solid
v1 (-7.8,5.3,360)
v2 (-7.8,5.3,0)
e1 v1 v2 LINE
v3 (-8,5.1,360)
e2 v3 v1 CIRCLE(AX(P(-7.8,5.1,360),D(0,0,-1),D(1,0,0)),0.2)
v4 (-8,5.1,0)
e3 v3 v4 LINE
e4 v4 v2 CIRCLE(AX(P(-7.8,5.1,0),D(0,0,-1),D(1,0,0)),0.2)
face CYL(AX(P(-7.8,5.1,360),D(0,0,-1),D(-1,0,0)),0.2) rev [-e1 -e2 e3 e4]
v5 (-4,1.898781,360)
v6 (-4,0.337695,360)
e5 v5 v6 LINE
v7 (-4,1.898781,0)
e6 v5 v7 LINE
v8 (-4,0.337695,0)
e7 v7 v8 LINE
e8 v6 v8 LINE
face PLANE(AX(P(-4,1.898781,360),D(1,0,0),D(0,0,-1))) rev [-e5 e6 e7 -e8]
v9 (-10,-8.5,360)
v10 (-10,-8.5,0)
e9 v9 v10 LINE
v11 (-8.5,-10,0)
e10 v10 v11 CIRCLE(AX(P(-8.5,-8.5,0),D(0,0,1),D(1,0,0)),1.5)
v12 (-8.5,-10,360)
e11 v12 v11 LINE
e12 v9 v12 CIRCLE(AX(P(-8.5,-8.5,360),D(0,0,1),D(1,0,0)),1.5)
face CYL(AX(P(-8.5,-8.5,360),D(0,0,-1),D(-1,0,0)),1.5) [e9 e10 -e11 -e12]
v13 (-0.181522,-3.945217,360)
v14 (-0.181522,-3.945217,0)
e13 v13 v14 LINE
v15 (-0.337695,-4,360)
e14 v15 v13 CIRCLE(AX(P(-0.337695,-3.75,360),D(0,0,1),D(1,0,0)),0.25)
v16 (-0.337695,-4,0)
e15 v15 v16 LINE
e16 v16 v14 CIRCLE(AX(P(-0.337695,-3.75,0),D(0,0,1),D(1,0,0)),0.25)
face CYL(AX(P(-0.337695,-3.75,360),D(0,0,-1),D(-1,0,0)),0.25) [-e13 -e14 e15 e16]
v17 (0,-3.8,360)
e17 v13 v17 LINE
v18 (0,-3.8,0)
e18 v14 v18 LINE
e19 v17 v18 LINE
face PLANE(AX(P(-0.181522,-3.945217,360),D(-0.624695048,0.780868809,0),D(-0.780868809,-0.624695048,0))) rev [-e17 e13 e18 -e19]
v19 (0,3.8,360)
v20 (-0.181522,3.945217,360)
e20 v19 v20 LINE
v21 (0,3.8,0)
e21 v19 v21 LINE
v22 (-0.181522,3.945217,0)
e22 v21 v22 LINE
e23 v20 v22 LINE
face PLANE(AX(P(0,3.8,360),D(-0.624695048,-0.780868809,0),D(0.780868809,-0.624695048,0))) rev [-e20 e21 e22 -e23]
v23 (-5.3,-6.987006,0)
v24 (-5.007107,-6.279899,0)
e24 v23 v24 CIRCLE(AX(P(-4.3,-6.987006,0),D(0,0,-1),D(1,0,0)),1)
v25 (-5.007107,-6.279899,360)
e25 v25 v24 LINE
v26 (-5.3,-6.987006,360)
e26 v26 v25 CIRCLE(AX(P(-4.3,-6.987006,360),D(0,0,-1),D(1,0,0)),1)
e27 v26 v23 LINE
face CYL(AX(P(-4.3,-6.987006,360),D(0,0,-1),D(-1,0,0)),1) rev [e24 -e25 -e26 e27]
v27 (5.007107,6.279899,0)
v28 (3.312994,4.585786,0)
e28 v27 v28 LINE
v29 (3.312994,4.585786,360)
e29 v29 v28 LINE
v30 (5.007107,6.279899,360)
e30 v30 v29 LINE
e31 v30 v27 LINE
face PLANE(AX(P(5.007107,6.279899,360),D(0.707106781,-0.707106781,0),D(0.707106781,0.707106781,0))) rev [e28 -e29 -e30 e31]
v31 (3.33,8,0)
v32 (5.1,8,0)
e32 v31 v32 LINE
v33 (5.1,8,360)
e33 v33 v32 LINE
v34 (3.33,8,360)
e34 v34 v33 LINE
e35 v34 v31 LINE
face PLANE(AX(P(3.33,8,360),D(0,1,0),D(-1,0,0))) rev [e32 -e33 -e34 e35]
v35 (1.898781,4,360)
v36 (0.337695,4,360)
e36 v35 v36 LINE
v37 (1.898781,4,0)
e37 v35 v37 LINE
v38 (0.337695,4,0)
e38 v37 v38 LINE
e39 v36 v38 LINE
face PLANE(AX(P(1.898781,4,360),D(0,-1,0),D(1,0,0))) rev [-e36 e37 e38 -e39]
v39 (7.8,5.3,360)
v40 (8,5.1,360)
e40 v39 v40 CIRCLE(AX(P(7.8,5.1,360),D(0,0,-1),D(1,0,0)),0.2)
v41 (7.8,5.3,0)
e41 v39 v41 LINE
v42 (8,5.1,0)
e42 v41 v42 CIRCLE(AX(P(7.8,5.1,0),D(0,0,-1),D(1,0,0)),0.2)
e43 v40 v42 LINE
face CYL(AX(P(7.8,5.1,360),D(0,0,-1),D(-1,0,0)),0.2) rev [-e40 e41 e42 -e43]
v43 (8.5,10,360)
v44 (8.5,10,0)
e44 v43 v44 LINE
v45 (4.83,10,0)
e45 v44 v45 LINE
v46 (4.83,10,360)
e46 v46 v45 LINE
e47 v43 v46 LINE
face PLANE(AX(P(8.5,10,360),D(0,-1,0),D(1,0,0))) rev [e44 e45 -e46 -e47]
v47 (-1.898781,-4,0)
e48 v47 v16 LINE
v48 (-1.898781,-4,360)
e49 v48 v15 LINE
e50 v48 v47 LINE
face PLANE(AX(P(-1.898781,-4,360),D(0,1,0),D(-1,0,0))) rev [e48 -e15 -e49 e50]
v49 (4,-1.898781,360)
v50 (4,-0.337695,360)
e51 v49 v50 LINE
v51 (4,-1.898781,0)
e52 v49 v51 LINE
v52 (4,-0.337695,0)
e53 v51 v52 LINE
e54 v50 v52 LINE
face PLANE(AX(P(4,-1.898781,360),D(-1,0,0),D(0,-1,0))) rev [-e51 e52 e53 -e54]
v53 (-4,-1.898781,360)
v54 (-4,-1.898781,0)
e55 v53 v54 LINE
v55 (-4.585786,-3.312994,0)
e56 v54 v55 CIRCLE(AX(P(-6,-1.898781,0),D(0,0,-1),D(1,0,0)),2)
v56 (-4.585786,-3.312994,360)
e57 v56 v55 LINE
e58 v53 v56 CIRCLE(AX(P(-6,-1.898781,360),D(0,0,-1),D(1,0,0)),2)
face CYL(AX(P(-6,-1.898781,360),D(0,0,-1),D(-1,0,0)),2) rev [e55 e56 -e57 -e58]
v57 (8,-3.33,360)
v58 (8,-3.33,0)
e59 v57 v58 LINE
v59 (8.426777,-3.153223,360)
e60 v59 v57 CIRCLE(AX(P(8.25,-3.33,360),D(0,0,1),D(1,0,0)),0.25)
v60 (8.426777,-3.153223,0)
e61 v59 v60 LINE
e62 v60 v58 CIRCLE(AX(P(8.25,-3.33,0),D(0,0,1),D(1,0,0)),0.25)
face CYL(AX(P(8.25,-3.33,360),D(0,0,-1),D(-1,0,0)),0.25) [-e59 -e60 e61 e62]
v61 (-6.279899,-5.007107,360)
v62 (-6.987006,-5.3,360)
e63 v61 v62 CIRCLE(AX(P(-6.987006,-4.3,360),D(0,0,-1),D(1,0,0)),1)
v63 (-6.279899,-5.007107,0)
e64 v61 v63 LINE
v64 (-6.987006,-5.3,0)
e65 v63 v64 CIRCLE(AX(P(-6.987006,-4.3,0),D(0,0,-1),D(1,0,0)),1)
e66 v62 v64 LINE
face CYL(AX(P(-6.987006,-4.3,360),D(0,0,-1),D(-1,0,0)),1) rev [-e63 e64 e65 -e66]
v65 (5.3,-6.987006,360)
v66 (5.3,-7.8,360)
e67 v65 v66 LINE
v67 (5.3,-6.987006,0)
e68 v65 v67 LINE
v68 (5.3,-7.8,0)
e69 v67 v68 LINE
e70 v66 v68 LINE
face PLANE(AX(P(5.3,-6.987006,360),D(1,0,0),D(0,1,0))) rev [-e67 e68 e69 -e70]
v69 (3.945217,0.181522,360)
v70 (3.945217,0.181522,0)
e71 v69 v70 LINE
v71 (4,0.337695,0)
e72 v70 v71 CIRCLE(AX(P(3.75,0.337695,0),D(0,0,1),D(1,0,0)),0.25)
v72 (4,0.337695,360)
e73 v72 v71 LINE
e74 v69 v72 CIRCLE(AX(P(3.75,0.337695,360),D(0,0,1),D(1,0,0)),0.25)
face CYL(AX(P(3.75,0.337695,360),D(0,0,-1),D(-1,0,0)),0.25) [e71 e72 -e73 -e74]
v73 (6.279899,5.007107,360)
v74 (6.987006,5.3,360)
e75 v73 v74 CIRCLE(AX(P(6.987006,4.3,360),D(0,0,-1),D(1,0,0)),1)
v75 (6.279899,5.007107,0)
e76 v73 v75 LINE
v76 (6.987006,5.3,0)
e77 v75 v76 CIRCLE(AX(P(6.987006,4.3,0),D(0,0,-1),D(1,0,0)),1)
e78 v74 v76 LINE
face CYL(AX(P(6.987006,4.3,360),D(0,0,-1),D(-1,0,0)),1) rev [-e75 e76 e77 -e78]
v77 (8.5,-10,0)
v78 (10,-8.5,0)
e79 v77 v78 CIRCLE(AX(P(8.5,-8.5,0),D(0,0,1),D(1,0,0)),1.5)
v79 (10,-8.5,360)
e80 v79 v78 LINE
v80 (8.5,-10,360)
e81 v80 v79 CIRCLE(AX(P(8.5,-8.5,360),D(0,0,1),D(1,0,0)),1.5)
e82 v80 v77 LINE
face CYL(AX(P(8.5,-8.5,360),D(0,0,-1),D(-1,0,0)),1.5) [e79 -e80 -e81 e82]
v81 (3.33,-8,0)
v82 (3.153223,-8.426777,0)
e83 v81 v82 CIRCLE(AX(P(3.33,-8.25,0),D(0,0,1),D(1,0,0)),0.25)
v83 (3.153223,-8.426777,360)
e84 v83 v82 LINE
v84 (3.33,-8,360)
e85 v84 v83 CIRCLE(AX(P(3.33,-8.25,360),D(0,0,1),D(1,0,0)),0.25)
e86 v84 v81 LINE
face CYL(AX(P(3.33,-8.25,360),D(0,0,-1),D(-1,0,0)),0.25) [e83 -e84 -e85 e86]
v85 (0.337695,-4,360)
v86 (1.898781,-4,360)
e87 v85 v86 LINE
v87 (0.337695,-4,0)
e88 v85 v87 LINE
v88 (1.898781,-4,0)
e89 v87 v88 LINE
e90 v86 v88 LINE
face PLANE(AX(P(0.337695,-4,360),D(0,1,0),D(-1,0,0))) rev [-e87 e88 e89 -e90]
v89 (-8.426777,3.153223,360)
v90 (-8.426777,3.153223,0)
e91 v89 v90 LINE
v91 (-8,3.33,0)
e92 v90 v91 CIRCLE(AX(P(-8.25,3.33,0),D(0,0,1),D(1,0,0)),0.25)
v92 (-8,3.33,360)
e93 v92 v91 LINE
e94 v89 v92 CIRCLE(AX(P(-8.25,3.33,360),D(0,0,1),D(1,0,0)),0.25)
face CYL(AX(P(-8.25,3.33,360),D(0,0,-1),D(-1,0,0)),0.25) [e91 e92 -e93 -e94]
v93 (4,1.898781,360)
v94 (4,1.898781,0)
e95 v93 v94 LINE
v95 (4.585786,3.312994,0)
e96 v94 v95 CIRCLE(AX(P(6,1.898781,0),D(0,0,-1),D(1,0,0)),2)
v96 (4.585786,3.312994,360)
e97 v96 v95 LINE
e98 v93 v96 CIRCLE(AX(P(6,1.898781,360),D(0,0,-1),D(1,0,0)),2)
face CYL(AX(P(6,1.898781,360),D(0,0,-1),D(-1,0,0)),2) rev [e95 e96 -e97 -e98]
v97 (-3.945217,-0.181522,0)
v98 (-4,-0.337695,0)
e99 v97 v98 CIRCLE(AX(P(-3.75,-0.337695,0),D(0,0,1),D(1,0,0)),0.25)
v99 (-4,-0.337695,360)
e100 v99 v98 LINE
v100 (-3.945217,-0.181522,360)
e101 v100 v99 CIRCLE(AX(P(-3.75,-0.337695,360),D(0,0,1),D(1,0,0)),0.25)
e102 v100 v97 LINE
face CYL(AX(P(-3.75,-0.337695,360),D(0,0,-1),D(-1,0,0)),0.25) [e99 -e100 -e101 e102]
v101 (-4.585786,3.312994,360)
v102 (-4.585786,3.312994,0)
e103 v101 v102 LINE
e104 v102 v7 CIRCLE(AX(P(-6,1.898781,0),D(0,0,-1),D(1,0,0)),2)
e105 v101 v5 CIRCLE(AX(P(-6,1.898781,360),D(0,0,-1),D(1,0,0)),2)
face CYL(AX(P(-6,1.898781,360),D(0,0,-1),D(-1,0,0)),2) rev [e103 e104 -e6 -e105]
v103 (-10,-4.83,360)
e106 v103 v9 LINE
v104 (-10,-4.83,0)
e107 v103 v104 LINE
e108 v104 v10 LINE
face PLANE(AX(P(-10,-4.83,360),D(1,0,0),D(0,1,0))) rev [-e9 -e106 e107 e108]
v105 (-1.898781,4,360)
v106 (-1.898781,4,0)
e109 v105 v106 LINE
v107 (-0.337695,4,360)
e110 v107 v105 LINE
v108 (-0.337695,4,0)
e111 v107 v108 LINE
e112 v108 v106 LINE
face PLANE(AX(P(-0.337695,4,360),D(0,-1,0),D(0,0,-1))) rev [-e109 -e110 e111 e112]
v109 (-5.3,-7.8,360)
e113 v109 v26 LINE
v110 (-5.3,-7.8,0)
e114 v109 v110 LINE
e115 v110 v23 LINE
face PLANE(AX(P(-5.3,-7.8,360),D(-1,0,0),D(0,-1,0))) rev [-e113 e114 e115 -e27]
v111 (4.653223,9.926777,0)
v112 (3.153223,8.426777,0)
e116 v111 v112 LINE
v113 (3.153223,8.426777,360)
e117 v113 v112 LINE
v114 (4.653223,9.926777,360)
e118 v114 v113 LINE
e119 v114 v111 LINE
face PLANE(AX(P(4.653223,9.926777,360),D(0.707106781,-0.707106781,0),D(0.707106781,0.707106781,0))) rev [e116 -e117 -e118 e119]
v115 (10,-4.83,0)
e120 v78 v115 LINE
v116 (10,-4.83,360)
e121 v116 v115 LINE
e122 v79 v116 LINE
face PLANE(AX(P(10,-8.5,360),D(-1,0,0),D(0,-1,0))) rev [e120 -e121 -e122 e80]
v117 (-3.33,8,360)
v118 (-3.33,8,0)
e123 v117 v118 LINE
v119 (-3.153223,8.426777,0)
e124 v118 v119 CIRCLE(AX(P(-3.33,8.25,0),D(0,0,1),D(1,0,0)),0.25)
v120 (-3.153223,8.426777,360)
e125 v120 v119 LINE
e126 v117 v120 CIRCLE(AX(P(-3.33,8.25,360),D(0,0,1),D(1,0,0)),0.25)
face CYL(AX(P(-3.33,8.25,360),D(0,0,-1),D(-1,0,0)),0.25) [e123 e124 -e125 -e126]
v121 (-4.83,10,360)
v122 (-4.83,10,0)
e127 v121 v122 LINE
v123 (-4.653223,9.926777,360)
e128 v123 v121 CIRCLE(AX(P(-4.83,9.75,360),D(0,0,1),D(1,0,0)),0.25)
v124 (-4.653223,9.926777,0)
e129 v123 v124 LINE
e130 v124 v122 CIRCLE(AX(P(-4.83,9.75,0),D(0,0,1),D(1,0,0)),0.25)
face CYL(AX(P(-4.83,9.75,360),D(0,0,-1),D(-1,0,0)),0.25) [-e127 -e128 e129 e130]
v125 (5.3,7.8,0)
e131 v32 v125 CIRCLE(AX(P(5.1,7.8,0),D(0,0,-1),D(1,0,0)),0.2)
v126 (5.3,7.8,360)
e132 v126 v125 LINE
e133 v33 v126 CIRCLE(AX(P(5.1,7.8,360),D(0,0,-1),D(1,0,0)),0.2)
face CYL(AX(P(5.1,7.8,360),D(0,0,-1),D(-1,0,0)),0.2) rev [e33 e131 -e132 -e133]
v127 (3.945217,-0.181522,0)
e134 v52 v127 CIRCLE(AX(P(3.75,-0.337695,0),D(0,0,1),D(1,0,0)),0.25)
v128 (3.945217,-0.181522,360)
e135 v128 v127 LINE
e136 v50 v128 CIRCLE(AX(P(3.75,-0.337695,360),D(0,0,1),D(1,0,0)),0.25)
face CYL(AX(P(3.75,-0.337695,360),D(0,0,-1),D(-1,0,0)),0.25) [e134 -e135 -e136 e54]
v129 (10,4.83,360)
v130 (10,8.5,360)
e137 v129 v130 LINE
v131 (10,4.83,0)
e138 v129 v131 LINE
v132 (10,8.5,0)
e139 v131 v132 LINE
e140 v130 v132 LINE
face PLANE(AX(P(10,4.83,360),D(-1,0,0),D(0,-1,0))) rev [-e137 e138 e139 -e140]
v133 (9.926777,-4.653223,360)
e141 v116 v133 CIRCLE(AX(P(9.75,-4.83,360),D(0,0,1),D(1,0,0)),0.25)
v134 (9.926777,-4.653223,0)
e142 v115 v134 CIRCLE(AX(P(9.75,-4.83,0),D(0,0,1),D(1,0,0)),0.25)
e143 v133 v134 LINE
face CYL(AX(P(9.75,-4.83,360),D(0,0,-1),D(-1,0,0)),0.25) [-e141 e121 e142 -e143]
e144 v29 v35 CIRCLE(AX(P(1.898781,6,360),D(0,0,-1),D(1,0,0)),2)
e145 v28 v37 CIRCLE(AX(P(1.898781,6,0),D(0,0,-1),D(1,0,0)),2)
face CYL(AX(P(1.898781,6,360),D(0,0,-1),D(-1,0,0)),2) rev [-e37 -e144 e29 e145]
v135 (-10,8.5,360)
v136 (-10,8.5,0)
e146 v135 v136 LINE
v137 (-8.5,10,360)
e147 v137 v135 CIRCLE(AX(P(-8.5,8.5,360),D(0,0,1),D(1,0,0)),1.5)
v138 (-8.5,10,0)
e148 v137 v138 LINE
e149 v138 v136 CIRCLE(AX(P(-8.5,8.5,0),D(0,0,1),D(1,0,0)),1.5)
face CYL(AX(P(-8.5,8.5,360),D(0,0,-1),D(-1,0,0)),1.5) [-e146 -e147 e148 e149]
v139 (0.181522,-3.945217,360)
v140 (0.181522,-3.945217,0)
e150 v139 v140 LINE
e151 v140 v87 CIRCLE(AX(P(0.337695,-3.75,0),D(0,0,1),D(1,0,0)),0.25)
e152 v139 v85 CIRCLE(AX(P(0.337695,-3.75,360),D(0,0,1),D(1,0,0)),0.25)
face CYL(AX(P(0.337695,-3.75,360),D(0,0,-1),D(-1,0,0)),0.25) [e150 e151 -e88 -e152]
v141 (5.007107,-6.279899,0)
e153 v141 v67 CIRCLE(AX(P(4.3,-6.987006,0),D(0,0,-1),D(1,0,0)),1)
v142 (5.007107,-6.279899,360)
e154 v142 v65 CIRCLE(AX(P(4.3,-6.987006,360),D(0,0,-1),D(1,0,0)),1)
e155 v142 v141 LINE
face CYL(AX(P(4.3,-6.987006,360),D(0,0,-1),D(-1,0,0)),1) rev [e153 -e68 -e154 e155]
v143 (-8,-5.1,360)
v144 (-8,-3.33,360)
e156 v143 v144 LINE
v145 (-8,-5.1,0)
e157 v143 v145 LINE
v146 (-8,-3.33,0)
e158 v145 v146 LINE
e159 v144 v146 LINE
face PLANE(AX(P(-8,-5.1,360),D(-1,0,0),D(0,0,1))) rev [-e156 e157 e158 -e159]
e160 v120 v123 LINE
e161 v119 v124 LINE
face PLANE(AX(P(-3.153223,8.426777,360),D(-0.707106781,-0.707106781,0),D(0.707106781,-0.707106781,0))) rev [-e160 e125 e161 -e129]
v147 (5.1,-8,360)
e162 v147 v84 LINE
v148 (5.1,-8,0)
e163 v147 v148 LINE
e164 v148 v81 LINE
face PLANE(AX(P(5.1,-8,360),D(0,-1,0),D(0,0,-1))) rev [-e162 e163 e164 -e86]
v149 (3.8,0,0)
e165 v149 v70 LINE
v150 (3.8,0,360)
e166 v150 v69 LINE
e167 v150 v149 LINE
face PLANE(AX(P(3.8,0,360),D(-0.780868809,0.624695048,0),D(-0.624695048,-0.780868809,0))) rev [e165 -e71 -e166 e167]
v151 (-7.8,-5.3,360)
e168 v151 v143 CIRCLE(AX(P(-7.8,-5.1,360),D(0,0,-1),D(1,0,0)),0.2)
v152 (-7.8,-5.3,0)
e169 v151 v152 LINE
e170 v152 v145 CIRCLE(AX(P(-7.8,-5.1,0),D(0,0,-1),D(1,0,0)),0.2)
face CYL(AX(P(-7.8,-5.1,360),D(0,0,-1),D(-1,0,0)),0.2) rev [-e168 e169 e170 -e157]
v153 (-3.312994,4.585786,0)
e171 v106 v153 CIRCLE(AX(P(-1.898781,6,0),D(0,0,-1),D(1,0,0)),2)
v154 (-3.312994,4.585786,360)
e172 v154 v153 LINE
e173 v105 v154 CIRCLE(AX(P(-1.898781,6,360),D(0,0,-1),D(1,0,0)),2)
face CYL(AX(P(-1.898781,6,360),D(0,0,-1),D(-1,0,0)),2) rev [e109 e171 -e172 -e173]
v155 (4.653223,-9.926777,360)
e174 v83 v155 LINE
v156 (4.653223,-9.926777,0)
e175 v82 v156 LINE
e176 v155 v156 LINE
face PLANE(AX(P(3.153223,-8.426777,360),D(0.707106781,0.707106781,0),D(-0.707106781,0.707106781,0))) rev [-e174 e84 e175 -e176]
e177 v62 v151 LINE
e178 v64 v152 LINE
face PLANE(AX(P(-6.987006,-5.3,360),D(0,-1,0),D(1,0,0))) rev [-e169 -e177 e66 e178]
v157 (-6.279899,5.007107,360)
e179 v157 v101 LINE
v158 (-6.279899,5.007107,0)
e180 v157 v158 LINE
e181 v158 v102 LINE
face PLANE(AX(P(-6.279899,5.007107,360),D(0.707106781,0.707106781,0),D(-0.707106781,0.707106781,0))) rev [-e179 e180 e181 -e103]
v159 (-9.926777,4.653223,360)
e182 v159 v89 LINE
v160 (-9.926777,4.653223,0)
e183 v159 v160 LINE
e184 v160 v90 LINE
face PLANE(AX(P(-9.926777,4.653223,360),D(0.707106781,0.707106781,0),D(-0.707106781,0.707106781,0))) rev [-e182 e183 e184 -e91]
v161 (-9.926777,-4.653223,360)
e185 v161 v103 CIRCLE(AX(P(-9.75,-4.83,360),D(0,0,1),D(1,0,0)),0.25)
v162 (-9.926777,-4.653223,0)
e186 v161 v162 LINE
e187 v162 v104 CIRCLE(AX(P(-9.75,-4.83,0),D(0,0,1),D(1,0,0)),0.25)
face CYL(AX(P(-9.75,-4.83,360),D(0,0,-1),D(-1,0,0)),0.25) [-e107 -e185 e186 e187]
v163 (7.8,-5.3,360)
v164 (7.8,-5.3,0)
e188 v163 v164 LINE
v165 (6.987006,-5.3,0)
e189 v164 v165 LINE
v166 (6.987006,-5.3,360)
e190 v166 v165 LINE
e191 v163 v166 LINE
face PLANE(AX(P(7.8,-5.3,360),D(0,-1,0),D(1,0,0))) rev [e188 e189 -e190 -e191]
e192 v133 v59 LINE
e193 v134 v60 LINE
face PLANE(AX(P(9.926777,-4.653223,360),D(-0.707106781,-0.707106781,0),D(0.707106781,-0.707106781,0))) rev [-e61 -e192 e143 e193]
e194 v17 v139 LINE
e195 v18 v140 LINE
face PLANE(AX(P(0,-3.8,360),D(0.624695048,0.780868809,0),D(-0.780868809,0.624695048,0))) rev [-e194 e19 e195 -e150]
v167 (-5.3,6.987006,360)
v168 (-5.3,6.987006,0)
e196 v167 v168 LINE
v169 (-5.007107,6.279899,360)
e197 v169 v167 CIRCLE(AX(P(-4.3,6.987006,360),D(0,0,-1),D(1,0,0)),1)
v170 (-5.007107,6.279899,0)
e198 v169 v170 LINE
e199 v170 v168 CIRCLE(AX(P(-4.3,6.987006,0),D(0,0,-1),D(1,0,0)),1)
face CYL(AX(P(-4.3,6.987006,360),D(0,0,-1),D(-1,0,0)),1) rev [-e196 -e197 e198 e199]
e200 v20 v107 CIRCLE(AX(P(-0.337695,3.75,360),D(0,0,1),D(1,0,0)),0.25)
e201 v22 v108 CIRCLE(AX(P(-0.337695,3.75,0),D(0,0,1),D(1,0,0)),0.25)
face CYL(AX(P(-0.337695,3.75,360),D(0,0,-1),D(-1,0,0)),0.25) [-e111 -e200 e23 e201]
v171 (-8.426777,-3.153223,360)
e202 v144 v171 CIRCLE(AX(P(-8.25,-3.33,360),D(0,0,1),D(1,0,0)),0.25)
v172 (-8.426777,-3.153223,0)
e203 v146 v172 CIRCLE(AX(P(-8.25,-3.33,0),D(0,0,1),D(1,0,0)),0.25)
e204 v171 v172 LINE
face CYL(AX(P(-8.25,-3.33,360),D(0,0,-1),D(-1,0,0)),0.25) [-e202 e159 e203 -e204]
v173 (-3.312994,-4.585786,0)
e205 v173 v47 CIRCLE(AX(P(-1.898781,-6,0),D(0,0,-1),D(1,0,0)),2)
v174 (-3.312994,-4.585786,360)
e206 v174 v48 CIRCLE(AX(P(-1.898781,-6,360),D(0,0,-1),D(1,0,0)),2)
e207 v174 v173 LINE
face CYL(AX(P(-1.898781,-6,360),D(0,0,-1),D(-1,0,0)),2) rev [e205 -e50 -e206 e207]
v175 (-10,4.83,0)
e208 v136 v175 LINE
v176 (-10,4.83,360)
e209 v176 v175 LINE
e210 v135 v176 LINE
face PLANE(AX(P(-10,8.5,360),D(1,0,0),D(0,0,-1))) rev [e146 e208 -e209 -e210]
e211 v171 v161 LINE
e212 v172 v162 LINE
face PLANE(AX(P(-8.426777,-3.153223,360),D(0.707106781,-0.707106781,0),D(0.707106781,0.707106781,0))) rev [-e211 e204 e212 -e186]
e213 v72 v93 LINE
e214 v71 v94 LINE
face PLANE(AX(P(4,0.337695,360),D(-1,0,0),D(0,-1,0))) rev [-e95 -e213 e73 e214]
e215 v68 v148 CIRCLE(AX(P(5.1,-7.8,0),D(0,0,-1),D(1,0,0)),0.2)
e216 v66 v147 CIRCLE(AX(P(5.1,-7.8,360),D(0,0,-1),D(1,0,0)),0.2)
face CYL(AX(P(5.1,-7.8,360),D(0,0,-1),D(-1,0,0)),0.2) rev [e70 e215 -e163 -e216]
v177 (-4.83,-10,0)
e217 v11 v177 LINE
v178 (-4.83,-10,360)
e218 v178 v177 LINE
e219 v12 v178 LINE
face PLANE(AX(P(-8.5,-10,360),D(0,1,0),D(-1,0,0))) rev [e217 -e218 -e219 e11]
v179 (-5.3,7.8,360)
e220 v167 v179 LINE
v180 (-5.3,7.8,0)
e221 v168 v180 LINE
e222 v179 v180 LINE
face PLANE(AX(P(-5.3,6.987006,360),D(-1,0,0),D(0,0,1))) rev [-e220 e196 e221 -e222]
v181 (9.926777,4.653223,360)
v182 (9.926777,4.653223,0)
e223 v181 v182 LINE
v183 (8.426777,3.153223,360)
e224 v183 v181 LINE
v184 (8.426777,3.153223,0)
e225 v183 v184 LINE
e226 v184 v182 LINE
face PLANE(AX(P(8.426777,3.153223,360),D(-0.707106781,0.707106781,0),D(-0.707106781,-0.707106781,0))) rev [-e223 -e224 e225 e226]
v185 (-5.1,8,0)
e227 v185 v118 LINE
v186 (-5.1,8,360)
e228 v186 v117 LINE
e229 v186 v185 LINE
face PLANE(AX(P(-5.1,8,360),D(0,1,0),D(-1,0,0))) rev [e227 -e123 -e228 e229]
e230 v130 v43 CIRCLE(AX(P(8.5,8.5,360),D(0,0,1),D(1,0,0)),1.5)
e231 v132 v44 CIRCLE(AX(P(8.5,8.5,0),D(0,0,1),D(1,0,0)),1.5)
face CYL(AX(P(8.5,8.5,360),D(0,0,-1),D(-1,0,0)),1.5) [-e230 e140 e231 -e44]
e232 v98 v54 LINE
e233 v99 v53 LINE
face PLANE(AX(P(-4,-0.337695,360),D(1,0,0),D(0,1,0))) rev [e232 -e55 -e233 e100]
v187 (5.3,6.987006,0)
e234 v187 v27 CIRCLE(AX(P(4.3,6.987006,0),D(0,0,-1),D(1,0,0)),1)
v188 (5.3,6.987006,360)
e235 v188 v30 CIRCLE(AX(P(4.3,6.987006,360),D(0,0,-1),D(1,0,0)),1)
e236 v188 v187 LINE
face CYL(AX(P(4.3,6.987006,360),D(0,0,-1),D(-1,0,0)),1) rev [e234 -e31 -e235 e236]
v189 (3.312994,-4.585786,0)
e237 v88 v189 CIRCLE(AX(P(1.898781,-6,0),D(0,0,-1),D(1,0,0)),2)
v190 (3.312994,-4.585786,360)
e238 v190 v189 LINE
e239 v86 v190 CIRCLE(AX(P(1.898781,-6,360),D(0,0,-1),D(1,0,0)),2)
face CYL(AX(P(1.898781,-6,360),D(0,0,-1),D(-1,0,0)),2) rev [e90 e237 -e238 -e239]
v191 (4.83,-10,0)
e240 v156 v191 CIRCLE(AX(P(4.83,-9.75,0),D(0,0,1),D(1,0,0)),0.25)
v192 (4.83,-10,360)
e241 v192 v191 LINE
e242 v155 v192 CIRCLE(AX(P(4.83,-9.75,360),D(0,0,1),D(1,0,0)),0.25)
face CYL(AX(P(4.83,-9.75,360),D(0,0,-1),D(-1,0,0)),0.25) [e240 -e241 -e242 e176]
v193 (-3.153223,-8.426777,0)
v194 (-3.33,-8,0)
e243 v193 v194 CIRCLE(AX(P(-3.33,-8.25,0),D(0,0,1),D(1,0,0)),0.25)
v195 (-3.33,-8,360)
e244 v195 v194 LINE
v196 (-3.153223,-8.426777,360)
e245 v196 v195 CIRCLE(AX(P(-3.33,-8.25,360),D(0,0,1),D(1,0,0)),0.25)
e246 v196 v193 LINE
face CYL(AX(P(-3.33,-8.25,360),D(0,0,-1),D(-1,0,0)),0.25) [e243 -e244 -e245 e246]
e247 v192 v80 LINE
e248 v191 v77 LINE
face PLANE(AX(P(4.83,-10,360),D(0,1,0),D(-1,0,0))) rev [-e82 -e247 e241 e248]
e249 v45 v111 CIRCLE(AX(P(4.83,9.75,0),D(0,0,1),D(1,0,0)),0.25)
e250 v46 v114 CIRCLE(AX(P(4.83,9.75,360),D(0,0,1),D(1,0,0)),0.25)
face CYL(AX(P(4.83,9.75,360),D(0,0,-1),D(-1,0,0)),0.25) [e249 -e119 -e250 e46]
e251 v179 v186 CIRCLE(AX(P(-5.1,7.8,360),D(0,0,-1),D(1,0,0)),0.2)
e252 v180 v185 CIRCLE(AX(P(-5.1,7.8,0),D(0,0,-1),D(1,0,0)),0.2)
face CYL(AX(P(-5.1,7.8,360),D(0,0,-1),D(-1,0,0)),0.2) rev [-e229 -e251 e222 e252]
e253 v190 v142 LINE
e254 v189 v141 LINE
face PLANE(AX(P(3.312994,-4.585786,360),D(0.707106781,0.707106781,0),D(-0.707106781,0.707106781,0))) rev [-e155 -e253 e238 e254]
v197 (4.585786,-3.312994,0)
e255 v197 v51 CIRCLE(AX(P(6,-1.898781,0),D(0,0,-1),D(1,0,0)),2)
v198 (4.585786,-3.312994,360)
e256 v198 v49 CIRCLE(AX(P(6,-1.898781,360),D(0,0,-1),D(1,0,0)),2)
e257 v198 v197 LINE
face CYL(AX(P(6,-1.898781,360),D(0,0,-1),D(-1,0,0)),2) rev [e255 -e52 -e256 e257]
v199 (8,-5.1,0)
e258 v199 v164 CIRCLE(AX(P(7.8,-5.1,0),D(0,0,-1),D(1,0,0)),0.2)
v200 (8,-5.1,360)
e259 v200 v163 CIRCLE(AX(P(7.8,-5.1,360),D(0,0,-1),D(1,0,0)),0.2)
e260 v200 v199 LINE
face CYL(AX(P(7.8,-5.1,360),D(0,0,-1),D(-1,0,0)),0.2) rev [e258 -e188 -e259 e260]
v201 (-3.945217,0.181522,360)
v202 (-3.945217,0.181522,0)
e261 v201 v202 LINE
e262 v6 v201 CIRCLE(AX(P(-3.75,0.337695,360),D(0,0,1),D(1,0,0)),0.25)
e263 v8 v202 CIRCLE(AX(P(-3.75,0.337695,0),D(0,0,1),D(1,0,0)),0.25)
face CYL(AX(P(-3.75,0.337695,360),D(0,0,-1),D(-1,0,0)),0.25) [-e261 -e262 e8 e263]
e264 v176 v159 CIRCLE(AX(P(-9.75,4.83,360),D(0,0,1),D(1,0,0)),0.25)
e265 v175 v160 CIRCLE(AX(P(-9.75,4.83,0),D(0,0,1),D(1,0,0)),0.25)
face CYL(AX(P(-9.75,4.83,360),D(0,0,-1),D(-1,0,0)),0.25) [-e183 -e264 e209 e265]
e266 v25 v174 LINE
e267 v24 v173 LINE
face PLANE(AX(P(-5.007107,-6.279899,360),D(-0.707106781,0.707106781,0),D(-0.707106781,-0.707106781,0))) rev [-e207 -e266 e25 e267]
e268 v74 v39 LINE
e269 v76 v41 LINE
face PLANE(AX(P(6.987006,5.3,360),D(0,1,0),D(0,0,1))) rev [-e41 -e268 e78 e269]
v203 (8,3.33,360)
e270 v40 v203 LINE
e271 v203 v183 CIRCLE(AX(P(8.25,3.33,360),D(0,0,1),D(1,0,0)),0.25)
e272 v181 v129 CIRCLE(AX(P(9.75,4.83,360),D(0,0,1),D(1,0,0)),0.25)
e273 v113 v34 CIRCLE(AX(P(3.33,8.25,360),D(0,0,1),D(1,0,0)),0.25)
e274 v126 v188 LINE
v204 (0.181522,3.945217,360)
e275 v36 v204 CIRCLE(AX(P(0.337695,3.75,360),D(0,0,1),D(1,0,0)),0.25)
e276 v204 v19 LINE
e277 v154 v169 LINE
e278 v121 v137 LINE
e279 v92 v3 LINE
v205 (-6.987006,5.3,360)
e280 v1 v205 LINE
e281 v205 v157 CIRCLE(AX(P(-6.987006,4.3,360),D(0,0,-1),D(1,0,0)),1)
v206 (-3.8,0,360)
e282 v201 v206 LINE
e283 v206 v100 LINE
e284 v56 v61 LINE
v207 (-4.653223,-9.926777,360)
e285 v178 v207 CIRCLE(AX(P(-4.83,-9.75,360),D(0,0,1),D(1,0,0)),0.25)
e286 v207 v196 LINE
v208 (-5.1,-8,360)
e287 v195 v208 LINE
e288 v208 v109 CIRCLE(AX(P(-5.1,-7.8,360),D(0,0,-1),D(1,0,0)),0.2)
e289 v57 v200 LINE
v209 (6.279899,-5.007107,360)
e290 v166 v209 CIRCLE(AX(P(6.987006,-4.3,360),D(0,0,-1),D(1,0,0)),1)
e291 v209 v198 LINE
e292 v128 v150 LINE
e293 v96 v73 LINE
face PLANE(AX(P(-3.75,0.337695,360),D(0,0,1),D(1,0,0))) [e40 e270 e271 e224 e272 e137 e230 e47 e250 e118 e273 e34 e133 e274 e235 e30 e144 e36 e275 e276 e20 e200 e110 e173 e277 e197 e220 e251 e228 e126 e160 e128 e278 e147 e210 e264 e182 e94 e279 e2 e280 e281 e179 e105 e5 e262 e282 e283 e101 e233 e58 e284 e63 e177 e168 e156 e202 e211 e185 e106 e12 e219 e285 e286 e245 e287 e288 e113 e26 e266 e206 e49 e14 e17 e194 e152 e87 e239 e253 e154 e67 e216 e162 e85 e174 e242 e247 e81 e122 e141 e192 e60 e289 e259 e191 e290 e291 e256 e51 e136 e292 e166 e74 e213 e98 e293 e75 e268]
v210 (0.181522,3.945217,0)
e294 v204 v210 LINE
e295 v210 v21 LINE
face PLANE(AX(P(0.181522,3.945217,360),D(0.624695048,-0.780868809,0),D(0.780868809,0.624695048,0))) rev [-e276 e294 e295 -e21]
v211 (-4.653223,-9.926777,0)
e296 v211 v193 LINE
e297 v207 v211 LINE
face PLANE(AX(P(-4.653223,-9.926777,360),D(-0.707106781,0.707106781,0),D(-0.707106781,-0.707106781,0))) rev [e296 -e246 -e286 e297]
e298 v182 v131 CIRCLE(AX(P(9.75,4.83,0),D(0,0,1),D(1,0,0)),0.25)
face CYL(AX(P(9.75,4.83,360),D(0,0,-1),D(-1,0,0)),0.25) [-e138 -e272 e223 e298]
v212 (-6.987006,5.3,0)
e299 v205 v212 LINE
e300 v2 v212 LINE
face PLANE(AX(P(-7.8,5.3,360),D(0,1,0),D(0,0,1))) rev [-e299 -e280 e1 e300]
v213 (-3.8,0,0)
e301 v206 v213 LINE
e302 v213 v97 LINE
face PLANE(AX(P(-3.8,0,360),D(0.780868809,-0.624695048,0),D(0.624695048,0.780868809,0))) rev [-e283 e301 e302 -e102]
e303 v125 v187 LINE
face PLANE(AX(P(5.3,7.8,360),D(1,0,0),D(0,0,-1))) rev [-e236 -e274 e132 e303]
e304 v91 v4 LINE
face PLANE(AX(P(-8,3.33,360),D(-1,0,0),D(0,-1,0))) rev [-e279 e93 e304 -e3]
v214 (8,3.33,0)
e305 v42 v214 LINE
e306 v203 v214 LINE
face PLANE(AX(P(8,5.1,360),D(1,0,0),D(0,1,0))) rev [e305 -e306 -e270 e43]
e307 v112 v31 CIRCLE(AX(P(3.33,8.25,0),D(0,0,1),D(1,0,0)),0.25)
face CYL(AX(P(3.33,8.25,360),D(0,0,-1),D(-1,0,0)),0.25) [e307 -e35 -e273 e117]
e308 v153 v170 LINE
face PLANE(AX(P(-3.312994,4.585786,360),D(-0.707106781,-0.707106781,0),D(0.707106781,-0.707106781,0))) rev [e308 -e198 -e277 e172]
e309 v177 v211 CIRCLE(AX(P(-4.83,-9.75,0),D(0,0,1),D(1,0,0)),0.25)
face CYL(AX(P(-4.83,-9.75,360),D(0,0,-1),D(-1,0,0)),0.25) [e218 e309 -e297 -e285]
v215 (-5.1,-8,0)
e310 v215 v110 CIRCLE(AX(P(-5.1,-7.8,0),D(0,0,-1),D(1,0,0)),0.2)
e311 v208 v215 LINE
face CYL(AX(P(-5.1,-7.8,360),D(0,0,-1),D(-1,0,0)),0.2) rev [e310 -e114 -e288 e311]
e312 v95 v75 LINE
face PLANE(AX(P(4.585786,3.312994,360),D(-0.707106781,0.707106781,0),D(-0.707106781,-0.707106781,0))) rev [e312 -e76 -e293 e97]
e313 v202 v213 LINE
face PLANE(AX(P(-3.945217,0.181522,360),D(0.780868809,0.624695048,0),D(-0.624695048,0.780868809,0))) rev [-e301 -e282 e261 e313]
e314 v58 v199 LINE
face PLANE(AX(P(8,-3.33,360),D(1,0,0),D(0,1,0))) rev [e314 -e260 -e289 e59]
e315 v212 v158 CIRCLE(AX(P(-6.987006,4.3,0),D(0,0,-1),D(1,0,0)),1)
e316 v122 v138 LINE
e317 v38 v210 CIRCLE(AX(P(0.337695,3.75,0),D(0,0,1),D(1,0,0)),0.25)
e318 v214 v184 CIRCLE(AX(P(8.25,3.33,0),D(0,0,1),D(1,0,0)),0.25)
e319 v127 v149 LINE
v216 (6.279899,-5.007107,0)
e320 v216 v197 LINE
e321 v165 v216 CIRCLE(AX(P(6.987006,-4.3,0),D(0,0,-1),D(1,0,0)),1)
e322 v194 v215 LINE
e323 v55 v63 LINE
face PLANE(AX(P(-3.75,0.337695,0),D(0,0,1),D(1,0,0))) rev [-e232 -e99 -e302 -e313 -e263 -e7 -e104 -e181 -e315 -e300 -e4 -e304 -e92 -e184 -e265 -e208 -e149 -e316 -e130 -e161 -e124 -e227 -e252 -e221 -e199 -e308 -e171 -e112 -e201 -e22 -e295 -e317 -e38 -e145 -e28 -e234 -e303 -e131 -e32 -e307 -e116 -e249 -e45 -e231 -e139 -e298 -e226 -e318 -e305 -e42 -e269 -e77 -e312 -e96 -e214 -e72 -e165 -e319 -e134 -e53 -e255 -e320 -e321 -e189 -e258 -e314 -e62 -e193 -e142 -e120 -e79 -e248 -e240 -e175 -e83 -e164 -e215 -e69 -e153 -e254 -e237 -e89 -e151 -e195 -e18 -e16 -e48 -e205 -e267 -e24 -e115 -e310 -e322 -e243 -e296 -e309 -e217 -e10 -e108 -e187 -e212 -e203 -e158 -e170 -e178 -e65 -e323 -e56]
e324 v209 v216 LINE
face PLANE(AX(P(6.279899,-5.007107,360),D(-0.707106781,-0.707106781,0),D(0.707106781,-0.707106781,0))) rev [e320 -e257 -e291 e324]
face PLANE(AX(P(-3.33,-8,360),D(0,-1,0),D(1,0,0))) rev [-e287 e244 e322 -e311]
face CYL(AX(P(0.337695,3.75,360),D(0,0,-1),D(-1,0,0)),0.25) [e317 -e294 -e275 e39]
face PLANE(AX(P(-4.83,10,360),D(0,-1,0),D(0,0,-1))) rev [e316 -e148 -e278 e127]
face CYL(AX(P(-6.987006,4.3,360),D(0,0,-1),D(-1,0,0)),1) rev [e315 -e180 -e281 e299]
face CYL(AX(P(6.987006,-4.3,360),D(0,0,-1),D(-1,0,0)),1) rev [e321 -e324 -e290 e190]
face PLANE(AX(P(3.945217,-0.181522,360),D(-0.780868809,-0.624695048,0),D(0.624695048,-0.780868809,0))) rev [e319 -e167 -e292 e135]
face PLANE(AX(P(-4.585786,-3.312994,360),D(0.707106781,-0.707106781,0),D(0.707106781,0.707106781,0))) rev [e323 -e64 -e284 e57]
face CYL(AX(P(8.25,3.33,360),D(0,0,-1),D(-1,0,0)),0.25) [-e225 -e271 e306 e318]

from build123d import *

# Parameters (mm, degrees)
EXTRUDE_1_DEPTH = 360


# Read off the part's stored shape, not the designer's step: 222 Конструкционный профиль 20х20-1-surface1
with BuildPart() as part:
    # Эскиз1 → Бобышка-Вытянуть1 (new body)
    with BuildSketch(Plane.XY):
        with BuildLine():
            Line((-3.945217202, 0.181521503), (-3.8, 0))
            Line((-3.8, 0), (-3.945217202, -0.181521503))
            ThreePointArc((-3.945217202, -0.181521503), (-3.98590708, -0.254943529), (-4, -0.337695265))
            Line((-4, -0.337695265), (-4, -1.898780669))
            ThreePointArc((-4, -1.898780669), (-4.152240935, -2.664147534), (-4.585786438, -3.312994231))
            Line((-4.585786438, -3.312994231), (-6.279898987, -5.007106781))
            ThreePointArc((-6.279898987, -5.007106781), (-6.604322336, -5.223879533), (-6.987005769, -5.3))
            Line((-6.987005769, -5.3), (-7.8, -5.3))
            ThreePointArc((-7.8, -5.3), (-7.941421356, -5.241421356), (-8, -5.1))
            Line((-8, -5.1), (-8, -3.33))
            ThreePointArc((-8, -3.33), (-8.154329142, -3.099030117), (-8.426776695, -3.153223305))
            Line((-8.426776695, -3.153223305), (-9.926776695, -4.653223305))
            ThreePointArc((-9.926776695, -4.653223305), (-9.980969883, -4.734329142), (-10, -4.83))
            Line((-10, -4.83), (-10, -8.5))
            ThreePointArc((-10, -8.5), (-9.560660172, -9.560660172), (-8.5, -10))
            Line((-8.5, -10), (-4.83, -10))
            ThreePointArc((-4.83, -10), (-4.734329142, -9.980969883), (-4.653223305, -9.926776695))
            Line((-4.653223305, -9.926776695), (-3.153223305, -8.426776695))
            ThreePointArc((-3.153223305, -8.426776695), (-3.099030117, -8.154329142), (-3.33, -8))
            Line((-3.33, -8), (-5.1, -8))
            ThreePointArc((-5.1, -8), (-5.241421356, -7.941421356), (-5.3, -7.8))
            Line((-5.3, -7.8), (-5.3, -6.987005769))
            ThreePointArc((-5.3, -6.987005769), (-5.223879533, -6.604322336), (-5.007106781, -6.279898987))
            Line((-5.007106781, -6.279898987), (-3.312994231, -4.585786438))
            ThreePointArc((-3.312994231, -4.585786438), (-2.664147534, -4.152240935), (-1.898780669, -4))
            Line((-1.898780669, -4), (-0.337695265, -4))
            ThreePointArc((-0.337695265, -4), (-0.254943529, -3.98590708), (-0.181521503, -3.945217202))
            Line((-0.181521503, -3.945217202), (0, -3.8))
            Line((0, -3.8), (0.181521503, -3.945217202))
            ThreePointArc((0.181521503, -3.945217202), (0.254943529, -3.98590708), (0.337695265, -4))
            Line((0.337695265, -4), (1.898780669, -4))
            ThreePointArc((1.898780669, -4), (2.664147534, -4.152240935), (3.312994231, -4.585786438))
            Line((3.312994231, -4.585786438), (5.007106781, -6.279898987))
            ThreePointArc((5.007106781, -6.279898987), (5.223879533, -6.604322336), (5.3, -6.987005769))
            Line((5.3, -6.987005769), (5.3, -7.8))
            ThreePointArc((5.3, -7.8), (5.241421356, -7.941421356), (5.1, -8))
            Line((5.1, -8), (3.33, -8))
            ThreePointArc((3.33, -8), (3.099030117, -8.154329142), (3.153223305, -8.426776695))
            Line((3.153223305, -8.426776695), (4.653223305, -9.926776695))
            ThreePointArc((4.653223305, -9.926776695), (4.734329142, -9.980969883), (4.83, -10))
            Line((4.83, -10), (8.5, -10))
            ThreePointArc((8.5, -10), (9.560660172, -9.560660172), (10, -8.5))
            Line((10, -8.5), (10, -4.83))
            ThreePointArc((10, -4.83), (9.980969883, -4.734329142), (9.926776695, -4.653223305))
            Line((9.926776695, -4.653223305), (8.426776695, -3.153223305))
            ThreePointArc((8.426776695, -3.153223305), (8.154329142, -3.099030117), (8, -3.33))
            Line((8, -3.33), (8, -5.1))
            ThreePointArc((8, -5.1), (7.941421356, -5.241421356), (7.8, -5.3))
            Line((7.8, -5.3), (6.987005769, -5.3))
            ThreePointArc((6.987005769, -5.3), (6.604322336, -5.223879533), (6.279898987, -5.007106781))
            Line((6.279898987, -5.007106781), (4.585786438, -3.312994231))
            ThreePointArc((4.585786438, -3.312994231), (4.152240935, -2.664147534), (4, -1.898780669))
            Line((4, -1.898780669), (4, -0.337695265))
            ThreePointArc((4, -0.337695265), (3.98590708, -0.254943529), (3.945217202, -0.181521503))
            Line((3.945217202, -0.181521503), (3.8, 0))
            Line((3.8, 0), (3.945217202, 0.181521503))
            ThreePointArc((3.945217202, 0.181521503), (3.98590708, 0.254943529), (4, 0.337695265))
            Line((4, 0.337695265), (4, 1.898780669))
            ThreePointArc((4, 1.898780669), (4.152240935, 2.664147534), (4.585786438, 3.312994231))
            Line((4.585786438, 3.312994231), (6.279898987, 5.007106781))
            ThreePointArc((6.279898987, 5.007106781), (6.604322336, 5.223879533), (6.987005769, 5.3))
            Line((6.987005769, 5.3), (7.8, 5.3))
            ThreePointArc((7.8, 5.3), (7.941421356, 5.241421356), (8, 5.1))
            Line((8, 5.1), (8, 3.33))
            ThreePointArc((8, 3.33), (8.154329142, 3.099030117), (8.426776695, 3.153223305))
            Line((8.426776695, 3.153223305), (9.926776695, 4.653223305))
            ThreePointArc((9.926776695, 4.653223305), (9.980969883, 4.734329142), (10, 4.83))
            Line((10, 4.83), (10, 8.5))
            ThreePointArc((10, 8.5), (9.560660172, 9.560660172), (8.5, 10))
            Line((8.5, 10), (4.83, 10))
            ThreePointArc((4.83, 10), (4.734329142, 9.980969883), (4.653223305, 9.926776695))
            Line((4.653223305, 9.926776695), (3.153223305, 8.426776695))
            ThreePointArc((3.153223305, 8.426776695), (3.099030117, 8.154329142), (3.33, 8))
            Line((3.33, 8), (5.1, 8))
            ThreePointArc((5.1, 8), (5.241421356, 7.941421356), (5.3, 7.8))
            Line((5.3, 7.8), (5.3, 6.987005769))
            ThreePointArc((5.3, 6.987005769), (5.223879533, 6.604322336), (5.007106781, 6.279898987))
            Line((5.007106781, 6.279898987), (3.312994231, 4.585786438))
            ThreePointArc((3.312994231, 4.585786438), (2.664147534, 4.152240935), (1.898780669, 4))
            Line((1.898780669, 4), (0.337695265, 4))
            ThreePointArc((0.337695265, 4), (0.254943529, 3.98590708), (0.181521503, 3.945217202))
            Line((0.181521503, 3.945217202), (0, 3.8))
            Line((0, 3.8), (-0.181521503, 3.945217202))
            ThreePointArc((-0.181521503, 3.945217202), (-0.254943529, 3.98590708), (-0.337695265, 4))
            Line((-0.337695265, 4), (-1.898780669, 4))
            ThreePointArc((-1.898780669, 4), (-2.664147534, 4.152240935), (-3.312994231, 4.585786438))
            Line((-3.312994231, 4.585786438), (-5.007106781, 6.279898987))
            ThreePointArc((-5.007106781, 6.279898987), (-5.223879533, 6.604322336), (-5.3, 6.987005769))
            Line((-5.3, 6.987005769), (-5.3, 7.8))
            ThreePointArc((-5.3, 7.8), (-5.241421356, 7.941421356), (-5.1, 8))
            Line((-5.1, 8), (-3.33, 8))
            ThreePointArc((-3.33, 8), (-3.099030117, 8.154329142), (-3.153223305, 8.426776695))
            Line((-3.153223305, 8.426776695), (-4.653223305, 9.926776695))
            ThreePointArc((-4.653223305, 9.926776695), (-4.734329142, 9.980969883), (-4.83, 10))
            Line((-4.83, 10), (-8.5, 10))
            ThreePointArc((-8.5, 10), (-9.560660172, 9.560660172), (-10, 8.5))
            Line((-10, 8.5), (-10, 4.83))
            ThreePointArc((-10, 4.83), (-9.980969883, 4.734329142), (-9.926776695, 4.653223305))
            Line((-9.926776695, 4.653223305), (-8.426776695, 3.153223305))
            ThreePointArc((-8.426776695, 3.153223305), (-8.154329142, 3.099030117), (-8, 3.33))
            Line((-8, 3.33), (-8, 5.1))
            ThreePointArc((-8, 5.1), (-7.941421356, 5.241421356), (-7.8, 5.3))
            Line((-7.8, 5.3), (-6.987005769, 5.3))
            ThreePointArc((-6.987005769, 5.3), (-6.604322336, 5.223879533), (-6.279898987, 5.007106781))
            Line((-6.279898987, 5.007106781), (-4.585786438, 3.312994231))
            ThreePointArc((-4.585786438, 3.312994231), (-4.152240935, 2.664147534), (-4, 1.898780669))
            Line((-4, 1.898780669), (-4, 0.337695265))
            ThreePointArc((-4, 0.337695265), (-3.98590708, 0.254943529), (-3.945217202, 0.181521503))
        make_face()
    extrude(amount=EXTRUDE_1_DEPTH)


solid = part.part
